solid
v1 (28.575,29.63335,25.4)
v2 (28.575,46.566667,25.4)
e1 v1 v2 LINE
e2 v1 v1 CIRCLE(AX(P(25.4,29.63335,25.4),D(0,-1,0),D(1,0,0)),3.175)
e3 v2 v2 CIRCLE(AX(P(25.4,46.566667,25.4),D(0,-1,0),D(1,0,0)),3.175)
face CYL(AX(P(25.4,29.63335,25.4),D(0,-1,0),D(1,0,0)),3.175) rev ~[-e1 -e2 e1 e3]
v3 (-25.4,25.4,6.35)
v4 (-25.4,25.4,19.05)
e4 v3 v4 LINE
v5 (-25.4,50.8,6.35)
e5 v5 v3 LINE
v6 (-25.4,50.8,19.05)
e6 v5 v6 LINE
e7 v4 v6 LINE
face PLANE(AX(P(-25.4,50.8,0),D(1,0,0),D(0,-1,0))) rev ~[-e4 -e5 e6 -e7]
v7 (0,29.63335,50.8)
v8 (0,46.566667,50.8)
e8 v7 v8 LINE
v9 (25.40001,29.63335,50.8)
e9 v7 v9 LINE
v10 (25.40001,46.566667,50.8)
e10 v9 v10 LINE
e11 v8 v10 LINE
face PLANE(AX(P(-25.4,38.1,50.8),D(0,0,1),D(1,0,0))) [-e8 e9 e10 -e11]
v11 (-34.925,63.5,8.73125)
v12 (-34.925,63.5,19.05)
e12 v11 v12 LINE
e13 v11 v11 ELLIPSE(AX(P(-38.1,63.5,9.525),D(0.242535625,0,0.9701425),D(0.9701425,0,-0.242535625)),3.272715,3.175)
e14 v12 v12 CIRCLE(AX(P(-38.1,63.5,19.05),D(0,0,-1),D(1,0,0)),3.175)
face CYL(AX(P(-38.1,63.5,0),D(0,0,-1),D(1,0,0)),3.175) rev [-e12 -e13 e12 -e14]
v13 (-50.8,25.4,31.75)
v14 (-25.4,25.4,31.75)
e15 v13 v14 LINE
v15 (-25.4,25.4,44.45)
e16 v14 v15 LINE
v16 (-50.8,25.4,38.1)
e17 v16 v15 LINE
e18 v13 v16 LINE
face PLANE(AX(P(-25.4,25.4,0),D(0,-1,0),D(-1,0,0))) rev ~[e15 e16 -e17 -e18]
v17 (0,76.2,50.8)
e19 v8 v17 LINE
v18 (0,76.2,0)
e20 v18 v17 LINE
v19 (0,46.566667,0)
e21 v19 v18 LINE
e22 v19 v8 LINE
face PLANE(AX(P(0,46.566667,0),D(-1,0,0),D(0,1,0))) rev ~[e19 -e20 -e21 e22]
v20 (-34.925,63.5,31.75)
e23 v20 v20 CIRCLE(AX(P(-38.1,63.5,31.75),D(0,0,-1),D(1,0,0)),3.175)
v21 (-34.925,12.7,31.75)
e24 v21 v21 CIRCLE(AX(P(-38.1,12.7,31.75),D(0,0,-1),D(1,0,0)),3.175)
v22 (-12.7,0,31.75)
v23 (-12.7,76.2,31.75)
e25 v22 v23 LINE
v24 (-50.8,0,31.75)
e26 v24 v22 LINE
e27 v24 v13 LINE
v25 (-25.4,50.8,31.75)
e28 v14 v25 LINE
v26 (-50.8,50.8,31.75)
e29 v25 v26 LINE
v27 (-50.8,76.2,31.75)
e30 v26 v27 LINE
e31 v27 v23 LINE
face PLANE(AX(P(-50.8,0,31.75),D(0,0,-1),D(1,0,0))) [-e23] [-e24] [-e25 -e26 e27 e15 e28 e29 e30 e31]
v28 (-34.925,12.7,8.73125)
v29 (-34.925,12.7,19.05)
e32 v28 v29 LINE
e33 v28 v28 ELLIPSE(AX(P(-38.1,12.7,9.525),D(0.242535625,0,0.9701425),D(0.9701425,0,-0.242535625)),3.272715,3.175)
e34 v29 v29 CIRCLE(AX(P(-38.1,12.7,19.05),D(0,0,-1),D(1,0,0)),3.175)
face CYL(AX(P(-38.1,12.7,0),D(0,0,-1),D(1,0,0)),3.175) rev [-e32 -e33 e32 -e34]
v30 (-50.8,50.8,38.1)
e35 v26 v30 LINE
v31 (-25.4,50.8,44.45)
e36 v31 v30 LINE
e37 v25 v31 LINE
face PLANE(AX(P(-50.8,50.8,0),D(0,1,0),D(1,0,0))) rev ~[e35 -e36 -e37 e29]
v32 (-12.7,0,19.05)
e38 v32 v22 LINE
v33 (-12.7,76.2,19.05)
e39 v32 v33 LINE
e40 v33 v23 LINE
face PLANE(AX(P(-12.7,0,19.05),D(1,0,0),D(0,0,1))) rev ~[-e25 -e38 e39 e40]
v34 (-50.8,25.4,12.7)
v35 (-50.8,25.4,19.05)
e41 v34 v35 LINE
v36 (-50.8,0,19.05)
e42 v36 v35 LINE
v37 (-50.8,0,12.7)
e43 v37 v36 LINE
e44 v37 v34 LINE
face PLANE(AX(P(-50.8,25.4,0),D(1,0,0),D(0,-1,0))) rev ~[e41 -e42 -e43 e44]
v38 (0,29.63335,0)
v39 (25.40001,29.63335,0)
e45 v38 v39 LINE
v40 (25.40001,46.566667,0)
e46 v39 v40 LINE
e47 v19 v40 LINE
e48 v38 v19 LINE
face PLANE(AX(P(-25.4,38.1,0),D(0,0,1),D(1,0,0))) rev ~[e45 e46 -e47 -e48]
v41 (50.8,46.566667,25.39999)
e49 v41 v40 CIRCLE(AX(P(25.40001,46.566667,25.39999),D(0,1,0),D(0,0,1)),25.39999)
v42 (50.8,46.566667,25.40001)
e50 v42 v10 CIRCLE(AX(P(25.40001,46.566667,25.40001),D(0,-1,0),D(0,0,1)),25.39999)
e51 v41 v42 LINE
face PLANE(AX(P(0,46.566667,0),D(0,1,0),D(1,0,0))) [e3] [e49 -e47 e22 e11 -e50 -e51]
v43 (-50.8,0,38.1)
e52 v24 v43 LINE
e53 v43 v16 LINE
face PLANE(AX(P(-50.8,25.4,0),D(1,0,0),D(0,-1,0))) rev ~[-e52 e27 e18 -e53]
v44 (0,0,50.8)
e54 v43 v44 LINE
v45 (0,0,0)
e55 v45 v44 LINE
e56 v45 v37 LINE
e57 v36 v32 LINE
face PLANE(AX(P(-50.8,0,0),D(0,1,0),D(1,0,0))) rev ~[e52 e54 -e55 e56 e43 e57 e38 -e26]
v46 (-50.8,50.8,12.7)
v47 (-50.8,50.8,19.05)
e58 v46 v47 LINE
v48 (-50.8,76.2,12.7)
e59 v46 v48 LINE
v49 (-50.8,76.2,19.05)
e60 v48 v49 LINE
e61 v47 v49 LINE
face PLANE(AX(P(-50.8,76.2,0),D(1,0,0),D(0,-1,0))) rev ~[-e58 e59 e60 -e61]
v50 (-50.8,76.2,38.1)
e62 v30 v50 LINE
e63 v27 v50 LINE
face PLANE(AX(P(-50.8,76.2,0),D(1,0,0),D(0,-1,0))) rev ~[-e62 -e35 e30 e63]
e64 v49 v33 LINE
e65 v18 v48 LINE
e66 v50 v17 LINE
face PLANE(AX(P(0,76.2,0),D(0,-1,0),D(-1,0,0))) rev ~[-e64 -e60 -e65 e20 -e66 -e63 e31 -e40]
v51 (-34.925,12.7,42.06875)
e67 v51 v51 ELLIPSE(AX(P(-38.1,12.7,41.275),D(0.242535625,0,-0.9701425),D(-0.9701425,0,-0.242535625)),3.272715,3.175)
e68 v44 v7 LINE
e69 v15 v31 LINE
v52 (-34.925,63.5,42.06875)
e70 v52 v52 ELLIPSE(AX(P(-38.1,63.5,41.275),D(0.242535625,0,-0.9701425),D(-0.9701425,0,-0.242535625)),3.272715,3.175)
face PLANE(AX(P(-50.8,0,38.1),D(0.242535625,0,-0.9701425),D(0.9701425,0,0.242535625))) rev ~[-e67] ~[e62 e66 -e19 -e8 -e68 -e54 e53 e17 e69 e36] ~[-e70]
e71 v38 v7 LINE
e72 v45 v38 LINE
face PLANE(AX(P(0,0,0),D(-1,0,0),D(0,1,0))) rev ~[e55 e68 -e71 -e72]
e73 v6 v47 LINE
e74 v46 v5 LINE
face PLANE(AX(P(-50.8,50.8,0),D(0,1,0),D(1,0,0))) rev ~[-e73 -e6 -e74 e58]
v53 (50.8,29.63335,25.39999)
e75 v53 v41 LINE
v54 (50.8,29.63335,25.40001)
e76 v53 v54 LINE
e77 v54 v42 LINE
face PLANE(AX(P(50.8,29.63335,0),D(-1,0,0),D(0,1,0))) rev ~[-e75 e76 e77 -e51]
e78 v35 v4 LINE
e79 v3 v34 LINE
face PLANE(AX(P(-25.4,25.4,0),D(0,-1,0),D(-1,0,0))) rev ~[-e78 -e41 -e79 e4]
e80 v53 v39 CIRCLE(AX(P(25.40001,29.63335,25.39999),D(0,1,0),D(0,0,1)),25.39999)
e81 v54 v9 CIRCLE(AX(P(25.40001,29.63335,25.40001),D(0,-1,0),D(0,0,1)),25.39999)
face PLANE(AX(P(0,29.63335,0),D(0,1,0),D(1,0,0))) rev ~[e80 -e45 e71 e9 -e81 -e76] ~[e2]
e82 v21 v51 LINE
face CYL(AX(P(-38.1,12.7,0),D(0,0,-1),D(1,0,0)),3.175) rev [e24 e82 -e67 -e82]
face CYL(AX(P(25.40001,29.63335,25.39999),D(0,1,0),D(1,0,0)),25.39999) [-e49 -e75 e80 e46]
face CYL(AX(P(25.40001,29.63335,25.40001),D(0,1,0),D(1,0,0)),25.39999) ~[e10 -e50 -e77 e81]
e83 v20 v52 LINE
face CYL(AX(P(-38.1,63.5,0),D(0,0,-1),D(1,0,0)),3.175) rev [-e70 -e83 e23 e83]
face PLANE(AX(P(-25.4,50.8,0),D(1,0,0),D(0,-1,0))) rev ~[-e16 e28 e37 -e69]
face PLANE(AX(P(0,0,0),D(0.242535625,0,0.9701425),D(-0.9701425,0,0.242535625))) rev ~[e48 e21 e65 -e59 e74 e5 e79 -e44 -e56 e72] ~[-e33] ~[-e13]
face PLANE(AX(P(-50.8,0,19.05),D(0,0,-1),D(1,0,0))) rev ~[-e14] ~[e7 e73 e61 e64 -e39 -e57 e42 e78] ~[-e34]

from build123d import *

# Parameters (mm, degrees)
F0_W      = 50.8
F0_H      = 16.9333164
F1_DEPTH  = 50.8
F2_R      = 25.39999
F4_DEPTH  = 119.50414
F5_R      = 3.175
F6_DEPTH  = 61.82298
F7_R      = 3.175
F8_DEPTH  = 63.51287
F9_W      = 38.1
F9_H      = 12.7
F10_DEPTH = 114.99064


# Not quite as in the source:
# - a fillet or chamfer is up to 0.001 mm smaller than in the source, because OpenCascade refuses the exact size


with BuildPart() as f1:
    # F0 (on Top) → F1 (new body)
    with BuildSketch(Plane.XY):
        Polygon((-50.8, 0), (0, 0), (0, 29.633350436), (0, 46.566666836), (0, 76.2), (-50.8, 76.2), (-50.8, 50.8), (-25.4, 50.8), (-25.4, 25.4), (-50.8, 25.4), align=None)
        with Locations((25.4, 38.100008636)):
            Rectangle(F0_W, F0_H)
    extrude(amount=F1_DEPTH)

    # F2 (radius 25.4 in the source; OpenCascade refuses exactly that, so slightly less here)
    f2_edges = [f1.edges().sort_by_distance(p)[0] for p in [
        (50.8, 38.100009, 50.8),
        (50.8, 38.100009, 0),
    ]]
    fillet(f2_edges, radius=F2_R)

    # F3 (on face) → F4 (cut)
    with BuildSketch(Plane.XZ):
        Polygon((-50.8, 50.8), (-50.8, 38.1), (0, 50.8), align=None)
        Polygon((0, 0), (-50.8, 12.7), (-50.8, 0), align=None)
    extrude(amount=-F4_DEPTH, mode=Mode.SUBTRACT)

    # F5 (on face) → F6 (cut)
    with BuildSketch(Plane.XZ.offset(-29.633350436)):
        with Locations((25.4, 25.4)):
            Circle(F5_R)
    extrude(amount=-F6_DEPTH, mode=Mode.SUBTRACT)

    # F7 (on face) → F8 (cut)
    with BuildSketch(Plane.XY):
        with Locations((-38.1, 12.7)):
            Circle(F7_R)
        with Locations((-38.1, 63.5)):
            Circle(F7_R)
    extrude(amount=F8_DEPTH, mode=Mode.SUBTRACT)

    # F9 (on face) → F10 (cut)
    with BuildSketch(Plane.XZ):
        with Locations((-31.75, 25.4)):
            Rectangle(F9_W, F9_H)
    extrude(amount=-F10_DEPTH, mode=Mode.SUBTRACT)


solid = f1.part
